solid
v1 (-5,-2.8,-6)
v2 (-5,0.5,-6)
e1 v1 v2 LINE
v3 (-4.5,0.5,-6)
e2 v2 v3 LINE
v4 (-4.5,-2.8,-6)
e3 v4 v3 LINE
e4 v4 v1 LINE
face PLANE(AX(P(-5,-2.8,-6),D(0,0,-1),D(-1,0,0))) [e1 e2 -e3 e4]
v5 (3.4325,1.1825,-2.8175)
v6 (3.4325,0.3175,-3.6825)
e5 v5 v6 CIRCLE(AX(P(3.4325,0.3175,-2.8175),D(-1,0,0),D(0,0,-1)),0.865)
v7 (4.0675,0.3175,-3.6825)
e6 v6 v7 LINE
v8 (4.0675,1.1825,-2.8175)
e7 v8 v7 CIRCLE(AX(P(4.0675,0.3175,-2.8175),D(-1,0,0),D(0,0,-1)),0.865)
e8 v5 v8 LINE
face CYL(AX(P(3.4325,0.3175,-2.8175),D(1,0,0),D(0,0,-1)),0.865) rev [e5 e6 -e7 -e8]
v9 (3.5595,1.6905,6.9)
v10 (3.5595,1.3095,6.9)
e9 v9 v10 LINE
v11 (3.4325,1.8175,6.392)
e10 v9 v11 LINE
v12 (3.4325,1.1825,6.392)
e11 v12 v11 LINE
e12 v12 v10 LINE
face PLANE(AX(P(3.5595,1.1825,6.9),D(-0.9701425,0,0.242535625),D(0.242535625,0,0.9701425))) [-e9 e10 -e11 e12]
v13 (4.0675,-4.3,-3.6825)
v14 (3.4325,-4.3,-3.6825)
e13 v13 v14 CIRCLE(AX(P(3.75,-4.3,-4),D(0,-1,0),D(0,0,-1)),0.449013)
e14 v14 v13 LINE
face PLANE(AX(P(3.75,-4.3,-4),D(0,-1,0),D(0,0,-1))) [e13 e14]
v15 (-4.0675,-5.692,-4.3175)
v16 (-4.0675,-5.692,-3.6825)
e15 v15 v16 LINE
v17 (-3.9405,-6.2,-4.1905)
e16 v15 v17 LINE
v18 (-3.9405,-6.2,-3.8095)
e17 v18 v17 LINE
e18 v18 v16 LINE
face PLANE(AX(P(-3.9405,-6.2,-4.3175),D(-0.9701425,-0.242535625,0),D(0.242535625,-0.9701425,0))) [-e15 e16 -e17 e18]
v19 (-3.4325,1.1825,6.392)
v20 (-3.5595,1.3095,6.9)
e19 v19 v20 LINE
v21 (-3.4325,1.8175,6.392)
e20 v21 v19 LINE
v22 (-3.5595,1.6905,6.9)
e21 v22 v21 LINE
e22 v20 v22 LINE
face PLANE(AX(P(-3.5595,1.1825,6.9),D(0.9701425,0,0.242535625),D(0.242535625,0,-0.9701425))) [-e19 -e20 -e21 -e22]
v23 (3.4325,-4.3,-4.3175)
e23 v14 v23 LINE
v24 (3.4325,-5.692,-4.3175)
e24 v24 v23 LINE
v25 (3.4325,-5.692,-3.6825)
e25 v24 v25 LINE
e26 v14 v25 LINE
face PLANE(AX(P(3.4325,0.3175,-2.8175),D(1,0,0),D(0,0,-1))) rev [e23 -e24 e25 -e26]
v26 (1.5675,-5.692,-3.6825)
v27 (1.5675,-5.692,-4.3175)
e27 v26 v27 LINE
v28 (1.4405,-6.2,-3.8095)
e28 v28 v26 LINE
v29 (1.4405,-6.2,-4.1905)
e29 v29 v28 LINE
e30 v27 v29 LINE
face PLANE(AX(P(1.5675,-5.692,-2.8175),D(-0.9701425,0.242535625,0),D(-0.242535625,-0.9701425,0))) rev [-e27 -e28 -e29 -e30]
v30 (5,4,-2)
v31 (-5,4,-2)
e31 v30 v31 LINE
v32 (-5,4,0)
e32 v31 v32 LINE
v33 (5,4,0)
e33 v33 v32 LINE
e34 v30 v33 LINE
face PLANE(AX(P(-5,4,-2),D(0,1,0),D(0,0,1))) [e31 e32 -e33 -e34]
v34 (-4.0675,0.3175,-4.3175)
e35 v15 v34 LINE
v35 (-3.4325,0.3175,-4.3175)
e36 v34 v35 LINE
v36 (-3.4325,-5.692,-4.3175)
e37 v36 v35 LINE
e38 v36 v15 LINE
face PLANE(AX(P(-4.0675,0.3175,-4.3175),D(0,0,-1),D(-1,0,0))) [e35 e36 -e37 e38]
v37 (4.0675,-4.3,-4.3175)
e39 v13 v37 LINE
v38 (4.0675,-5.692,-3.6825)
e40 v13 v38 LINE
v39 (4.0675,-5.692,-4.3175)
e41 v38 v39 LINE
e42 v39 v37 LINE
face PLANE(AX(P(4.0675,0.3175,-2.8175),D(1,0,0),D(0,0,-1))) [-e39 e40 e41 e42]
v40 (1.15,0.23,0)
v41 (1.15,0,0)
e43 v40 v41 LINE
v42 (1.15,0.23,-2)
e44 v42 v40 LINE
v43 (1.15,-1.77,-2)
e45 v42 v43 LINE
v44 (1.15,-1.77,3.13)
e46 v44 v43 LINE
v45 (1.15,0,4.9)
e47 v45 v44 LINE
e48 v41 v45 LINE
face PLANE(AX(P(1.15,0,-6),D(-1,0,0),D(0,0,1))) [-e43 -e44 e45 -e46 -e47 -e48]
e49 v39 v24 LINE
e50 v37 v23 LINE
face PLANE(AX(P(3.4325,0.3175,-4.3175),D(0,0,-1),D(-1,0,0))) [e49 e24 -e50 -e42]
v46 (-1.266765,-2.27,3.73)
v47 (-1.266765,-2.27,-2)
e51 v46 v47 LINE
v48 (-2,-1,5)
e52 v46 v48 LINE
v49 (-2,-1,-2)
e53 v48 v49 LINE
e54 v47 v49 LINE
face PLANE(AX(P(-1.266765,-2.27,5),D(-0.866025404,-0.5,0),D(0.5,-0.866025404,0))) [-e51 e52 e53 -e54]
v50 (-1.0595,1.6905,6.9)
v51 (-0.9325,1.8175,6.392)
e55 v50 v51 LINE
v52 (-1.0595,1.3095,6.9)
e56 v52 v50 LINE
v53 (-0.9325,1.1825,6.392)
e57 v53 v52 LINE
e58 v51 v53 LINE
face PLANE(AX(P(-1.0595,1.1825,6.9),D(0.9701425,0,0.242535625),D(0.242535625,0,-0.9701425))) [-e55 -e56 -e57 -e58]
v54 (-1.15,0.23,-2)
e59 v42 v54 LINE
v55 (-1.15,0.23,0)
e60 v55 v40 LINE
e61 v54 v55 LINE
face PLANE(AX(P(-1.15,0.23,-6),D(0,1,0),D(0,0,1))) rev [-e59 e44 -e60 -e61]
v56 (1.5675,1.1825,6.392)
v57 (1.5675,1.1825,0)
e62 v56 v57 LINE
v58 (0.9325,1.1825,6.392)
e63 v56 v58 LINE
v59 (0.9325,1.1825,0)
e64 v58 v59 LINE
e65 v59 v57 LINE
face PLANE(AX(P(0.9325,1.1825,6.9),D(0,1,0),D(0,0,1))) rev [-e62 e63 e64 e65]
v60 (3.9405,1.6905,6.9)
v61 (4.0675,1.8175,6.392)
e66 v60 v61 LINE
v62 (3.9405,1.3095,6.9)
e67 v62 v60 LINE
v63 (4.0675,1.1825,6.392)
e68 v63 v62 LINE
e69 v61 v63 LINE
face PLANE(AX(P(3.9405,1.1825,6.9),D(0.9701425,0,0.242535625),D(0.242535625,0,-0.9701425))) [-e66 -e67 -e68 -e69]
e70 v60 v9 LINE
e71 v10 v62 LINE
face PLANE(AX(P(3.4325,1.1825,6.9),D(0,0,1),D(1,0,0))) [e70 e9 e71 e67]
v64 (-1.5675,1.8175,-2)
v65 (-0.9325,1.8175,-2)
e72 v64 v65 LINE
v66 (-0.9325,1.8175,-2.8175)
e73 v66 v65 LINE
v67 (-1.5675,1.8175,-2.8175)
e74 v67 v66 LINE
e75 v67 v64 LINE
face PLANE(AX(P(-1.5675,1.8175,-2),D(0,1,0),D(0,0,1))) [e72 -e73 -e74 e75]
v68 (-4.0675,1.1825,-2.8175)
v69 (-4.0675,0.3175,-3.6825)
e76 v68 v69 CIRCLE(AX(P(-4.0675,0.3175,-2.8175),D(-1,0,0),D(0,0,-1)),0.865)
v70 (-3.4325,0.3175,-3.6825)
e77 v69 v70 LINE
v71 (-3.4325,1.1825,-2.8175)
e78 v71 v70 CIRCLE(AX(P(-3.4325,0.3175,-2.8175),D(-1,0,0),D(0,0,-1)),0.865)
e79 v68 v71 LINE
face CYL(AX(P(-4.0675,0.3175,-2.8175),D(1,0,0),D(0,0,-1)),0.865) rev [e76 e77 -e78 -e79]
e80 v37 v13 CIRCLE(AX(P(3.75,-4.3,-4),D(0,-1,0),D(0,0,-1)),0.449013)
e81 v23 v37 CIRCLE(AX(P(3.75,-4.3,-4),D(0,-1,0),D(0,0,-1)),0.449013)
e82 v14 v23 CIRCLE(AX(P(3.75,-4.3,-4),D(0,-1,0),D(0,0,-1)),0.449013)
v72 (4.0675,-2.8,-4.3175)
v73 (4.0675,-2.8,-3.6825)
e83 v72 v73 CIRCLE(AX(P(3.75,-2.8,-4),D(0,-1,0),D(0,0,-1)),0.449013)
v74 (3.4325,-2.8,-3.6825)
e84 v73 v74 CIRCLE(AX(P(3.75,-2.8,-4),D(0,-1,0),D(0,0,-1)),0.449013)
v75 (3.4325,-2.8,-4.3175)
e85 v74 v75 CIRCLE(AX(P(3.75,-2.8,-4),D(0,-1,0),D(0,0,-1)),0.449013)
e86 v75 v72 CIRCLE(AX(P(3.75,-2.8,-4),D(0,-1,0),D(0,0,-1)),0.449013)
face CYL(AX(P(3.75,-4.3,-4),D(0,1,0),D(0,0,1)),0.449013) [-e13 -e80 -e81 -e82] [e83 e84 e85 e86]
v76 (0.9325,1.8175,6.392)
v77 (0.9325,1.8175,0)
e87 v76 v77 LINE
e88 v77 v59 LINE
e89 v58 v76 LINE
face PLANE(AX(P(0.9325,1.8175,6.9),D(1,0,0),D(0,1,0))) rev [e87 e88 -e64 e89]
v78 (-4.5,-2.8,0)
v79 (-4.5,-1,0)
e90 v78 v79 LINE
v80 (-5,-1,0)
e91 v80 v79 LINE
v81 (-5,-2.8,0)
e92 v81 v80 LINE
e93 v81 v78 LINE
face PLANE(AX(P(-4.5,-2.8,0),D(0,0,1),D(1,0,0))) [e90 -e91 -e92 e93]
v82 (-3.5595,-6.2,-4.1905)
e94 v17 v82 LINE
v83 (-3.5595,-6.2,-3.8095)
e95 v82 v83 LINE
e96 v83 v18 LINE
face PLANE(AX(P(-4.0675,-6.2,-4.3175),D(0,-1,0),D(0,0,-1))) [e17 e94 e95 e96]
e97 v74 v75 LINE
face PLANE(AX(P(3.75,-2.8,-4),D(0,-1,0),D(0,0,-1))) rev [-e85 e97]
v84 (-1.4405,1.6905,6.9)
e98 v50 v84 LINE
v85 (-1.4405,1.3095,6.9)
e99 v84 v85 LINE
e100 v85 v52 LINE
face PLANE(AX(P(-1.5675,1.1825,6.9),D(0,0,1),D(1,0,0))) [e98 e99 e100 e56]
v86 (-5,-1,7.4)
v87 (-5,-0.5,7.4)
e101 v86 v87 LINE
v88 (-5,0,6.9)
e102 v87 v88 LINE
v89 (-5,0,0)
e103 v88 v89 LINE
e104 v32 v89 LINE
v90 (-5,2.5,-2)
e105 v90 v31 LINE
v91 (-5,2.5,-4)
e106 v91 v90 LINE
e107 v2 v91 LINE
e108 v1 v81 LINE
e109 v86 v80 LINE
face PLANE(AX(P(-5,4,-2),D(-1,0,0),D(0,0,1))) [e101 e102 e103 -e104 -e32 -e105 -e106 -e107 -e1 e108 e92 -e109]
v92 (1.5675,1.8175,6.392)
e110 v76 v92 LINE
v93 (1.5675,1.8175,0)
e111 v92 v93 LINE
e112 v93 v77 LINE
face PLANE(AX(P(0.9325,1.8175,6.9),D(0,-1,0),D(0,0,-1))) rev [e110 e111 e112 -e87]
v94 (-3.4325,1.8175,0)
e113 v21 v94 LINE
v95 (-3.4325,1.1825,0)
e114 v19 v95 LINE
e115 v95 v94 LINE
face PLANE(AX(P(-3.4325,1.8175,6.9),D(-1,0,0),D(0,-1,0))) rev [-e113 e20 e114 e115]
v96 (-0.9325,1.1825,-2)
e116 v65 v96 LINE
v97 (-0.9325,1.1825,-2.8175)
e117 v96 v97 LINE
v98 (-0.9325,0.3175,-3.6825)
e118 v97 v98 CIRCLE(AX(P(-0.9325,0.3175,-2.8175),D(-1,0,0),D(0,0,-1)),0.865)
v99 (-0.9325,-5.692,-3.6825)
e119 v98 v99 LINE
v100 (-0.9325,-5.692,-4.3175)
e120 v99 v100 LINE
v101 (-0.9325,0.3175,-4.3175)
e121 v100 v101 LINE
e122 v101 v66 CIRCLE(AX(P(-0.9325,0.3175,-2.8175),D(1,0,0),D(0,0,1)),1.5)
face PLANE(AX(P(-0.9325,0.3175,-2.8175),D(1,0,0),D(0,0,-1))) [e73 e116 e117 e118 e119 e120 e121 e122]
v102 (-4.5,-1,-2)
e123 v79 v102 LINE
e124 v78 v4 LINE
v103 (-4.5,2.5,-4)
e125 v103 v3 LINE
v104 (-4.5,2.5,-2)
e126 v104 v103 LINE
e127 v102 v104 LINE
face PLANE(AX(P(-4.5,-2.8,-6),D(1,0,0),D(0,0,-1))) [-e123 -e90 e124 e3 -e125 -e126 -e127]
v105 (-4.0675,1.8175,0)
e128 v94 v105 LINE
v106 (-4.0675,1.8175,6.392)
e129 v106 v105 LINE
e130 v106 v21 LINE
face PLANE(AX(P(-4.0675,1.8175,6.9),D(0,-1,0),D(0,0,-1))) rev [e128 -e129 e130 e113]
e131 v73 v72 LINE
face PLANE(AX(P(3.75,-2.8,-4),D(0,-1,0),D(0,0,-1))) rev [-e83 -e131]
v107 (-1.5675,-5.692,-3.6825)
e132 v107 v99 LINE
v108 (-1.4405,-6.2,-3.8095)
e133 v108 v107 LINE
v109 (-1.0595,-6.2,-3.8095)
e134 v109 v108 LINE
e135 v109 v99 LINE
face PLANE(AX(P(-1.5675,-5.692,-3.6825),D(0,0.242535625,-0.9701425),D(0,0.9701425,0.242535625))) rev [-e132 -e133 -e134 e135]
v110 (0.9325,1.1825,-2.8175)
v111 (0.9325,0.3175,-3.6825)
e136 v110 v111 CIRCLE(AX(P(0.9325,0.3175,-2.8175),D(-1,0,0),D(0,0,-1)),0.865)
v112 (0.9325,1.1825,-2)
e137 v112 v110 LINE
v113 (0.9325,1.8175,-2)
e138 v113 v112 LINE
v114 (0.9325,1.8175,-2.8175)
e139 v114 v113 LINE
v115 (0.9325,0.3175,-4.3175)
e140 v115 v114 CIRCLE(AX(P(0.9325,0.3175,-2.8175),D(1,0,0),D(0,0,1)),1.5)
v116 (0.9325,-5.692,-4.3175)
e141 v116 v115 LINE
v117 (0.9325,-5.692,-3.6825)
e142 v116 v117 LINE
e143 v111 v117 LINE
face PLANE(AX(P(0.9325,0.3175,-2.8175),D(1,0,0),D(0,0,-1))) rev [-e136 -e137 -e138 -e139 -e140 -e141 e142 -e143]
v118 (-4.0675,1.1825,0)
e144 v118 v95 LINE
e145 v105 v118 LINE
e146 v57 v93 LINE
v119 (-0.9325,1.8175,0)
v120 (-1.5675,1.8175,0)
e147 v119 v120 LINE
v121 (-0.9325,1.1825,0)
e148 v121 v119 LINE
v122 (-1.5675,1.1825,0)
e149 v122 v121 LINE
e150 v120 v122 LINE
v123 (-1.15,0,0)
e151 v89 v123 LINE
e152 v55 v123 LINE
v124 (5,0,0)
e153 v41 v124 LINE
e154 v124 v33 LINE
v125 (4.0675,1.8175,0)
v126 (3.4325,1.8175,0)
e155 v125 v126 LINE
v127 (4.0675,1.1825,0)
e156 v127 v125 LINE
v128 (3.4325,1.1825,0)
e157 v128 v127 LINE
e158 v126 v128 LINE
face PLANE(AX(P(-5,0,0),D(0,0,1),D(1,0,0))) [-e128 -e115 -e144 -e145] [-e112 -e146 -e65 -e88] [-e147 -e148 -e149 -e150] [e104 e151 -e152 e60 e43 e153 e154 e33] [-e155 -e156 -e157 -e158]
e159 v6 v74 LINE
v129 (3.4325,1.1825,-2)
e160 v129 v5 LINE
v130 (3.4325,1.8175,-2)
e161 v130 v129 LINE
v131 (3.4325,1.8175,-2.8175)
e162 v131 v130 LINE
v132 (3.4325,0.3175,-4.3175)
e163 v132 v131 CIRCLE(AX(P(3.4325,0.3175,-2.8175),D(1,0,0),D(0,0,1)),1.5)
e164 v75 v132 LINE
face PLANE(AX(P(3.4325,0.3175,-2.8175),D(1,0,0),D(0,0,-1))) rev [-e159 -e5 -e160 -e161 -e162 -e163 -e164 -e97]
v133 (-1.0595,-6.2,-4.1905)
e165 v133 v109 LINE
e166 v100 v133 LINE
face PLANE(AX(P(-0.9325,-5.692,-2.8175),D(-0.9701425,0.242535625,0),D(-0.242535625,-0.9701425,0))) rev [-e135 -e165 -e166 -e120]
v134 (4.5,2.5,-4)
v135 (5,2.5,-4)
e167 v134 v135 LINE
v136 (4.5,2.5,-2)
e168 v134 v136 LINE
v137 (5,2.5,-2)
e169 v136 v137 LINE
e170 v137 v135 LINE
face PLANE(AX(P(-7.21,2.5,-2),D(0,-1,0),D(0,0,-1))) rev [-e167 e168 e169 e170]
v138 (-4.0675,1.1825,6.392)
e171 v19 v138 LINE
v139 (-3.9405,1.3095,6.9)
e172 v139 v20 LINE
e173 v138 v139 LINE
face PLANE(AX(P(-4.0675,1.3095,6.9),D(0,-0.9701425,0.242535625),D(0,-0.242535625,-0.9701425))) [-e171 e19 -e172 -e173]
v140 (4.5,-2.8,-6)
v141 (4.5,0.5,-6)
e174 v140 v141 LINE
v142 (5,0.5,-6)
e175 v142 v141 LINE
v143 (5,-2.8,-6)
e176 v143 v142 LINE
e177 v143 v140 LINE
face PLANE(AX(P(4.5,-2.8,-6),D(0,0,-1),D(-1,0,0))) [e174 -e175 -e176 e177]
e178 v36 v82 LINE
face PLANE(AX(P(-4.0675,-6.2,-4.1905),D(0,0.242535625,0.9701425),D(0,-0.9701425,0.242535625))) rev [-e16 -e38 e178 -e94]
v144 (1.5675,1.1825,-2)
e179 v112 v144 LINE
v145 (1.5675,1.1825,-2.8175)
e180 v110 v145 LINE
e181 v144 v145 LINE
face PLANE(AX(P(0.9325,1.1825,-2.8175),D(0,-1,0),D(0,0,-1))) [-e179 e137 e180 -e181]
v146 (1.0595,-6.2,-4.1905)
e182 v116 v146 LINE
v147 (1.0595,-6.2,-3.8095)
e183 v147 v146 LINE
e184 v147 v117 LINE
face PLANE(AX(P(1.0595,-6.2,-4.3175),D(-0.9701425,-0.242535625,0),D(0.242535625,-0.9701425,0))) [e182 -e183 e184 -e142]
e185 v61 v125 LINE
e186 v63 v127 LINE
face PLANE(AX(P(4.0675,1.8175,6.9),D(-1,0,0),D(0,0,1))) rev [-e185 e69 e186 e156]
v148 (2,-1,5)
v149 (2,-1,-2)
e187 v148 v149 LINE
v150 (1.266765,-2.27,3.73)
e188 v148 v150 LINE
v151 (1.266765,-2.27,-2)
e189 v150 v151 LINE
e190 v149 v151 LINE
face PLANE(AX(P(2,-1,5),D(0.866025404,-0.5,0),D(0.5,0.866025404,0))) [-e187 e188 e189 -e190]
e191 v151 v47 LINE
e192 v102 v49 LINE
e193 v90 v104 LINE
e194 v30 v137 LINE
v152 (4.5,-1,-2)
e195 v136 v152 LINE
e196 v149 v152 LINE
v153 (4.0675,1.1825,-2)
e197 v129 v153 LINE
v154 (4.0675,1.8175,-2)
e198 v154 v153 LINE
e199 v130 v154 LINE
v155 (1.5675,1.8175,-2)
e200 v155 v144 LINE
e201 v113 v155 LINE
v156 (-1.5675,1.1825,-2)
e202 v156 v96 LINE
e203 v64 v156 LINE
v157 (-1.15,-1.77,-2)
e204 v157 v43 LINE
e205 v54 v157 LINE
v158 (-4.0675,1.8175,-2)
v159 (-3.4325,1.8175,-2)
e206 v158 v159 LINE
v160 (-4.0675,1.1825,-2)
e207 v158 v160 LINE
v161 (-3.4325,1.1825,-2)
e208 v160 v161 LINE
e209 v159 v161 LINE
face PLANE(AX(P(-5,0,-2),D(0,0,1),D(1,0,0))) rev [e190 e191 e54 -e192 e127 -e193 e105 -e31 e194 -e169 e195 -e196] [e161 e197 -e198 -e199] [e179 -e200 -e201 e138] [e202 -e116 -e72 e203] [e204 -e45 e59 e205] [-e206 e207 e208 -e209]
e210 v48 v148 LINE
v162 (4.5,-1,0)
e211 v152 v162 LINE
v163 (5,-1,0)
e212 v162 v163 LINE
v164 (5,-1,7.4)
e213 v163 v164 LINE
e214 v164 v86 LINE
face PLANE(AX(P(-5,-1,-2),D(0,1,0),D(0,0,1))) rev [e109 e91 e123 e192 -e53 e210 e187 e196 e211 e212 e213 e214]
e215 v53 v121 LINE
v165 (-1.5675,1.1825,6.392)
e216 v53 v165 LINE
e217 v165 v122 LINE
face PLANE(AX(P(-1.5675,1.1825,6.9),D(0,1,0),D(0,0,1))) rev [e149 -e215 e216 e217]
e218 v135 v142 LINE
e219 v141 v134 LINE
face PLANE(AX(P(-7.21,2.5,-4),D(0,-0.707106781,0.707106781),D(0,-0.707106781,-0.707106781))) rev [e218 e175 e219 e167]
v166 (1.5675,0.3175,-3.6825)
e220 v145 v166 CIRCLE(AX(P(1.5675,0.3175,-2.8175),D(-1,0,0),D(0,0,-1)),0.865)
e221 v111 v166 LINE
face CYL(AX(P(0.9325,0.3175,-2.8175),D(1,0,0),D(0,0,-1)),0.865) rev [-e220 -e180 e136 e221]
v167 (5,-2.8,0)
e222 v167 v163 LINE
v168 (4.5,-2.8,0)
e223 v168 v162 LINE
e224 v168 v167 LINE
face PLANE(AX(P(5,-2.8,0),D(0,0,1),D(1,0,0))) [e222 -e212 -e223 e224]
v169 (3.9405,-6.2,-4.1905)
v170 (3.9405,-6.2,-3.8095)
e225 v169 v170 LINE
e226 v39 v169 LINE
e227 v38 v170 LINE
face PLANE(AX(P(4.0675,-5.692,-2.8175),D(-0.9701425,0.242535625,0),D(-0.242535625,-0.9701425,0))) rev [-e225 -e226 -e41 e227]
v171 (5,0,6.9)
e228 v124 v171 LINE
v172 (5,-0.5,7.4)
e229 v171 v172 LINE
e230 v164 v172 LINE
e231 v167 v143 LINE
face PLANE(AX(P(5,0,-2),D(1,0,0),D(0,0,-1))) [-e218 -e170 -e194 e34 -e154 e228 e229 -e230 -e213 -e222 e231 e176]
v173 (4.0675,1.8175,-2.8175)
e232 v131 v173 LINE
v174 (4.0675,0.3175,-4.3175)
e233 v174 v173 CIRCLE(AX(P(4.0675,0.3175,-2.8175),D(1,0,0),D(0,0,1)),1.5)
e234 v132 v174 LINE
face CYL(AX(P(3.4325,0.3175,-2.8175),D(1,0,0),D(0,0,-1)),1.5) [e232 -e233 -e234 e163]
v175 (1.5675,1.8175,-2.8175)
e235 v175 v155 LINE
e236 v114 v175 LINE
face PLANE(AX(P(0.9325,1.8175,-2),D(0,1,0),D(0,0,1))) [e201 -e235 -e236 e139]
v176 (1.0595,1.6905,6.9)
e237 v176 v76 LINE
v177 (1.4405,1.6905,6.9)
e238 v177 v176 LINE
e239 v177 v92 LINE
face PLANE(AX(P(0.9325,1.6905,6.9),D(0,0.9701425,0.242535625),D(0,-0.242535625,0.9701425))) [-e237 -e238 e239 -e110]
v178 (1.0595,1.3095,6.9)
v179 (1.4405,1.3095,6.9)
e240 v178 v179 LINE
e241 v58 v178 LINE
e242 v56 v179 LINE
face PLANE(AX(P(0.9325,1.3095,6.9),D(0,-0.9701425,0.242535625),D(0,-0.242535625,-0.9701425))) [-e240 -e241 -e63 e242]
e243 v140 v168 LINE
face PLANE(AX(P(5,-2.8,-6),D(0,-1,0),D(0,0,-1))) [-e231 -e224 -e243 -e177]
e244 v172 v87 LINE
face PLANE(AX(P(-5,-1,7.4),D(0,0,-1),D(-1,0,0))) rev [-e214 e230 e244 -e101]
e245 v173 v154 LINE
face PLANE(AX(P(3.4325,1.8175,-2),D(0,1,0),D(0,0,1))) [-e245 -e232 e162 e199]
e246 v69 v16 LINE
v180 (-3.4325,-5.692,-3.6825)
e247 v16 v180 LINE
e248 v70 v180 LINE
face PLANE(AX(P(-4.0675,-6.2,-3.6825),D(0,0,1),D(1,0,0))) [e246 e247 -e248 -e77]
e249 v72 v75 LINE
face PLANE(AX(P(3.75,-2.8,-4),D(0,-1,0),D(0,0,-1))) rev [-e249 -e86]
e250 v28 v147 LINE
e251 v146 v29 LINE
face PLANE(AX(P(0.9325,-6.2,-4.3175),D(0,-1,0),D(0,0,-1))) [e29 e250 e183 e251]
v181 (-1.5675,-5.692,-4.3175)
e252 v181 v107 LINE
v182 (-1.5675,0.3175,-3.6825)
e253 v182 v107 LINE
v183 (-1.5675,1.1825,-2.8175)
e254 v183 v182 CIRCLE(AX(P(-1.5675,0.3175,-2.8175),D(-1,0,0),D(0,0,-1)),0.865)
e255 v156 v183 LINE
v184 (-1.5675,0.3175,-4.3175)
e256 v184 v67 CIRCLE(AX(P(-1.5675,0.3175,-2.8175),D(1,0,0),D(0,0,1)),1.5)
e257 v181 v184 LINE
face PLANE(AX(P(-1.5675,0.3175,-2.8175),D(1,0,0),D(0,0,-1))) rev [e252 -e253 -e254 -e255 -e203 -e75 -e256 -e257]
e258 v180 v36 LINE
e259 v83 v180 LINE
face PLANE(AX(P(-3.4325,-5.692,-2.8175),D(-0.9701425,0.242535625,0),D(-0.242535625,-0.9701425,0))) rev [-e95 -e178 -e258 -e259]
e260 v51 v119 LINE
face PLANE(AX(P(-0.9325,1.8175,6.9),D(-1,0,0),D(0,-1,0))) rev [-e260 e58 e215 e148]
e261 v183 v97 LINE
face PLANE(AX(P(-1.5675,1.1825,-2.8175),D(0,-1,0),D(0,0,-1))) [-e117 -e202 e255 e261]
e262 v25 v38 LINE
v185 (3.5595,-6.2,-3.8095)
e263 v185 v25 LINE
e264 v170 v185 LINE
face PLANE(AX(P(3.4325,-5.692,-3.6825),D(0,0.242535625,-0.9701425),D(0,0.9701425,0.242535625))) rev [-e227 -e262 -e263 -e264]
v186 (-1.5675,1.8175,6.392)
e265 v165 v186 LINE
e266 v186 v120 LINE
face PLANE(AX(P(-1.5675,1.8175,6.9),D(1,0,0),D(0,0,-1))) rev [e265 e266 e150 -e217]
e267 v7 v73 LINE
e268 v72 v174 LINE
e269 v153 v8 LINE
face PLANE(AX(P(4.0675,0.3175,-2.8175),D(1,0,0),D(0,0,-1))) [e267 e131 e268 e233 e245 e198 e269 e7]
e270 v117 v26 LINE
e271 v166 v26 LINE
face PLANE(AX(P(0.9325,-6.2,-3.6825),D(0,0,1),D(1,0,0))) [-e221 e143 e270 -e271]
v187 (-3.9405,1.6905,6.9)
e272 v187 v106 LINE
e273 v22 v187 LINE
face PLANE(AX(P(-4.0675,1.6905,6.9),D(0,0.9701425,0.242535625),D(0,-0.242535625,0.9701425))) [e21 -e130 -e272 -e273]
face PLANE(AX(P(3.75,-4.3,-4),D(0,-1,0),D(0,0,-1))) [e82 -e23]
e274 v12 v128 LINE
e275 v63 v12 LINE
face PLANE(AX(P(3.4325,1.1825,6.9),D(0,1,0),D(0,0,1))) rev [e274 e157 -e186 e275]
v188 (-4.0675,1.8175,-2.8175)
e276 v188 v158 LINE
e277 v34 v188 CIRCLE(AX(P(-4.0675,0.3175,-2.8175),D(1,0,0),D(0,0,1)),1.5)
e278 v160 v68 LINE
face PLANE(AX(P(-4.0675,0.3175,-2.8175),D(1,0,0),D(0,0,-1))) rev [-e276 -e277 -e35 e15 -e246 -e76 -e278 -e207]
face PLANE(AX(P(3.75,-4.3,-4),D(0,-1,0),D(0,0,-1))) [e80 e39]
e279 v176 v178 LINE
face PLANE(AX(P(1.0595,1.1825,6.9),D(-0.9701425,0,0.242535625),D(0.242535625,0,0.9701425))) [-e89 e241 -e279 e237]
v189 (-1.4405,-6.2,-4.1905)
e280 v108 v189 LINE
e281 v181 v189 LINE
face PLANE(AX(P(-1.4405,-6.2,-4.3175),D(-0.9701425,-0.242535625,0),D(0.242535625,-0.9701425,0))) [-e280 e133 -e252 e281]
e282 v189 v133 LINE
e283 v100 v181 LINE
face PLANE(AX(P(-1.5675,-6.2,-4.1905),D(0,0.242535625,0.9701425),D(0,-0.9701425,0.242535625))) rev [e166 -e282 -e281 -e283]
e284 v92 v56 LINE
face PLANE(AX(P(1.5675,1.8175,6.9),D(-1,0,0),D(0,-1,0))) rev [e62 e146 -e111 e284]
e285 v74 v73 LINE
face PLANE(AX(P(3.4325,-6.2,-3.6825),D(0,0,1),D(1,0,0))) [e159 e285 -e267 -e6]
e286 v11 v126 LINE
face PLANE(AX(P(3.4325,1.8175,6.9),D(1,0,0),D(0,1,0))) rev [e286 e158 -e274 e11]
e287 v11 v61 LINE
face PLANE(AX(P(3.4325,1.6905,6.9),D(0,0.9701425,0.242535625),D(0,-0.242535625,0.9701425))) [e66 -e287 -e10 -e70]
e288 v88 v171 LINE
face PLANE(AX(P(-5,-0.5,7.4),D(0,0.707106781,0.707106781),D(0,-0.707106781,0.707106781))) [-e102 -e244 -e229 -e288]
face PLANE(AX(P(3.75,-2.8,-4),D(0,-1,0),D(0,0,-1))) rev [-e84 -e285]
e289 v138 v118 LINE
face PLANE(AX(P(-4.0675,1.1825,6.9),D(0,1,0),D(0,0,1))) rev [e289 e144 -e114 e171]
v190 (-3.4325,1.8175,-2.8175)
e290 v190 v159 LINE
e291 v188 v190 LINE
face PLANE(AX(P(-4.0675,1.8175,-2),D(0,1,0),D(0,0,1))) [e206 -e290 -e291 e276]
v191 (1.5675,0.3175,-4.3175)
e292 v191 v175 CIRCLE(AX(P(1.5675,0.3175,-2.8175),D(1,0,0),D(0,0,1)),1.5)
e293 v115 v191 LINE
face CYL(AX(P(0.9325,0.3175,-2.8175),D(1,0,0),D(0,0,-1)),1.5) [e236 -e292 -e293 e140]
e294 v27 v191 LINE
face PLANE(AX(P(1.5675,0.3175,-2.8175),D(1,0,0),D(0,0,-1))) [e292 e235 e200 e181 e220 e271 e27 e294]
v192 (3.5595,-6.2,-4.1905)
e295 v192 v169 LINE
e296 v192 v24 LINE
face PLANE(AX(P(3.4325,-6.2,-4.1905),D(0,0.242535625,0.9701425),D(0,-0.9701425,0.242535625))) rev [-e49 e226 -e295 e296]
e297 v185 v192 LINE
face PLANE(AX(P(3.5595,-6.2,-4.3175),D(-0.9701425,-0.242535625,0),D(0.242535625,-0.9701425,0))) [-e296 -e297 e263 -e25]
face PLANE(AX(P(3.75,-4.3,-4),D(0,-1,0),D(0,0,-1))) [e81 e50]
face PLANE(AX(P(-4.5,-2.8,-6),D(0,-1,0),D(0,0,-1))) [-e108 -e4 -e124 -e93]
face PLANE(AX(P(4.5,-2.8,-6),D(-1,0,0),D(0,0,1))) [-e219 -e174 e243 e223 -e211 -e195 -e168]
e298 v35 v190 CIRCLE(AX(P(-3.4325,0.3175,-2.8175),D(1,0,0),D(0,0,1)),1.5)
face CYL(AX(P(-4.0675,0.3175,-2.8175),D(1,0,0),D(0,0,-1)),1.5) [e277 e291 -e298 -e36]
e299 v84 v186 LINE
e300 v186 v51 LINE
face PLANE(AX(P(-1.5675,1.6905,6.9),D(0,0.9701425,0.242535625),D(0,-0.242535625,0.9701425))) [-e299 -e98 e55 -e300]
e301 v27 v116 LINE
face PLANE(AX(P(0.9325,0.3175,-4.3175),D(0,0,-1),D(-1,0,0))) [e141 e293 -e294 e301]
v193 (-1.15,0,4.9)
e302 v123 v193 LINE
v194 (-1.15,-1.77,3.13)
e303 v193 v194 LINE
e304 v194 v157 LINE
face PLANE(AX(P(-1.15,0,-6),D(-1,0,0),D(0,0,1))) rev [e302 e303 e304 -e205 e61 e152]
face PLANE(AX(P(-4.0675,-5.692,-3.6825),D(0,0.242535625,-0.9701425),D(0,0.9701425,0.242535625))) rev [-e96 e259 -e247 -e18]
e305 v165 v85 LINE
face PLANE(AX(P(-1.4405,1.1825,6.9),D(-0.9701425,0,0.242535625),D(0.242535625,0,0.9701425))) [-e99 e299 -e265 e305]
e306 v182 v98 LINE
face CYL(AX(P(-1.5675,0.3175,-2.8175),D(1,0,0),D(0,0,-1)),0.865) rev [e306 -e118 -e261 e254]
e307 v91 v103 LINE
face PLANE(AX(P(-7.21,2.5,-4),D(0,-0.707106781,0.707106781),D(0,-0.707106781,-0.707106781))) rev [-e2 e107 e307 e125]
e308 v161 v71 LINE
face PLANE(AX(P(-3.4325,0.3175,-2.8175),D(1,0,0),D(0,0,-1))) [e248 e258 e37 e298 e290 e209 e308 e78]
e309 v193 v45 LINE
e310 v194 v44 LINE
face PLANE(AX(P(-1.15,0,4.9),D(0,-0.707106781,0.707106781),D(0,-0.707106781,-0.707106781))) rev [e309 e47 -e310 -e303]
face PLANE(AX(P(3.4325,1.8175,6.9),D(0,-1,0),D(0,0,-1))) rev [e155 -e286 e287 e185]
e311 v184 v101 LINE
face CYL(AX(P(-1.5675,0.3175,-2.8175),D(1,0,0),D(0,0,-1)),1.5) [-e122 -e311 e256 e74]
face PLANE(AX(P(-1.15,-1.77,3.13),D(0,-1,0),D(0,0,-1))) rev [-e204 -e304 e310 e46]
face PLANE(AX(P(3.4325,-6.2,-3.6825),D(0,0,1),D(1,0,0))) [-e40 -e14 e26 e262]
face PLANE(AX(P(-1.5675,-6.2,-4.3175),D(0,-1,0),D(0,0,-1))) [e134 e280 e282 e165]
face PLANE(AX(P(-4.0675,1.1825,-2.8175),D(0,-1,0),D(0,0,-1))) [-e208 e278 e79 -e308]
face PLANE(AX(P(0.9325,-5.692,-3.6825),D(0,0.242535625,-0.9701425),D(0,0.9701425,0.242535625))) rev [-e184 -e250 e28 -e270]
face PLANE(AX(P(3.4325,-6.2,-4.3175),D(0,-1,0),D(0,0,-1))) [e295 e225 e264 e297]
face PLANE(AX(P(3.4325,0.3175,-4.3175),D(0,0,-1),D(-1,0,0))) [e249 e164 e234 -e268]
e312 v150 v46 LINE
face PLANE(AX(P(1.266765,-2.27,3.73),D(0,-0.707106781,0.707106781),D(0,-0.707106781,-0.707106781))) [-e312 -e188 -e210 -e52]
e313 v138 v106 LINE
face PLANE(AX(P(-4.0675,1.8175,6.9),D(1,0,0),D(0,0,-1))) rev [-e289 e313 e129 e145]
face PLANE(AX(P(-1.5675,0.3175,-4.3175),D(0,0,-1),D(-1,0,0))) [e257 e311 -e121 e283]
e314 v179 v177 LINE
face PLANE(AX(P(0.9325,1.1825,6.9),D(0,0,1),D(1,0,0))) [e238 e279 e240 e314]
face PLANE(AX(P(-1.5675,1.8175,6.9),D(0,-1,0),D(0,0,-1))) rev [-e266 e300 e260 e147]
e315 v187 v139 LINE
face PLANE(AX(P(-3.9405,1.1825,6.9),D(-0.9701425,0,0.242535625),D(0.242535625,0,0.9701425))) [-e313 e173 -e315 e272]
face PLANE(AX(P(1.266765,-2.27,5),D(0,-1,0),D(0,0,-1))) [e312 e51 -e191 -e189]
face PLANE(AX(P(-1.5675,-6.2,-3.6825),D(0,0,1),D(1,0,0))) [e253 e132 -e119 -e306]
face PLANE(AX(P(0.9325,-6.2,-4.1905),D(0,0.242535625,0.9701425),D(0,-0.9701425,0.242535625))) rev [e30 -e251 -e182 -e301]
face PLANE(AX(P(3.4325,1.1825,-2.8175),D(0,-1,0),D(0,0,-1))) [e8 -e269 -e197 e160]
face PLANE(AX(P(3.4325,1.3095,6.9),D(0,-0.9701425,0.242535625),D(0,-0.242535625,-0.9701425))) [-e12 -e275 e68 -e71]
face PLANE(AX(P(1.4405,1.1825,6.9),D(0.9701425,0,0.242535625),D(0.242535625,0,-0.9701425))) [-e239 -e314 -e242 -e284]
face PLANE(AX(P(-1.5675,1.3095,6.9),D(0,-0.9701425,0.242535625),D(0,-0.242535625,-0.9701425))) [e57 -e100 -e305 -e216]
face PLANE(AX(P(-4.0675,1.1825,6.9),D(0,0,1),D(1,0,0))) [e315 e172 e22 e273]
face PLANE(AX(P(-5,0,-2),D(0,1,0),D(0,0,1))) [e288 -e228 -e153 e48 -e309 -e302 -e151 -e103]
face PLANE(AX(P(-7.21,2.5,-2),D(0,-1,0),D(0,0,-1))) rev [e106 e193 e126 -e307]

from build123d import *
from OCP.BRepFilletAPI import BRepFilletAPI_MakeChamfer

# Parameters (mm, degrees)
SKETCH1_W                             = 10
SKETCH1_H                             = 4
BODY_BASE_DEPTH                       = 2
SKETCH2_W                             = 0.635
SKETCH2_H                             = 0.635
HORIZONTAL_PINS_DEPTH                 = 6.9
SKETCH3_W                             = 10
SKETCH3_H                             = 9.4
BODY_HORIZONTAL_SHELF_DEPTH           = 1
MATING_CONNECTOR_LEAD_IN_CHAMFER_SIZE = 0.5
SKETCH4_W                             = 0.5
SKETCH4_H                             = 6
BODY_SIDEWALLS_DEPTH                  = 6.8
BODY_SIDEWALL_MATERIA_REMOVALL_DEPTH  = 7.21
LOCKING_TROUGH_EXTERIOR_DEPTH         = 7
LOCKING_TROUGH_CHAMFER_EXTERIOR_SIZE  = 1.27
LOCKING_TROUGH_MATERIAL_REMOVAL_DEPTH = 1.15
REMAINDER_OF_PIN_DEPTH                = 0.635
LPATTERN_COMPLEMENT_OF_PINS_COUNT     = 4
LPATTERN_COMPLEMENT_OF_PINS_PITCH     = 2.5
PIN_CHAMFER1_SIZE                     = 0.508
PIN_CHAMFER1_SIZE2                    = 0.127
PIN_CHAMFER2_SIZE                     = 0.127
PIN_CHAMFER2_SIZE2                    = 0.508
SKETCH11_R                            = 0.449012806
PIN_1_MARKING_AND_MATE_AIDE_DEPTH     = 1.5


with BuildPart() as part:
    # Sketch1 → Body base (new body)
    with BuildSketch(Plane.XY):
        with Locations((0, 2)):
            Rectangle(SKETCH1_W, SKETCH1_H)
    extrude(amount=-BODY_BASE_DEPTH)

    # Sketch2 → Horizontal pins (add)
    with BuildSketch(Plane.XY):
        with Locations((-3.75, 1.5)):
            Rectangle(SKETCH2_W, SKETCH2_H)
        with Locations((-1.25, 1.5)):
            Rectangle(SKETCH2_W, SKETCH2_H)
        with Locations((1.25, 1.5)):
            Rectangle(SKETCH2_W, SKETCH2_H)
        with Locations((3.75, 1.5)):
            Rectangle(SKETCH2_W, SKETCH2_H)
    extrude(amount=HORIZONTAL_PINS_DEPTH)

    # Sketch3 → Body - horizontal shelf (add)
    with BuildSketch(Plane.XZ):
        with Locations((0, 2.7)):
            Rectangle(SKETCH3_W, SKETCH3_H)
    extrude(amount=BODY_HORIZONTAL_SHELF_DEPTH)

    # Mating connector lead-in chamfer
    mating_connector_lead_in_chamfer_edges = [part.edges().sort_by_distance(p)[0] for p in [
        (0, 0, 7.4),
    ]]
    chamfer(mating_connector_lead_in_chamfer_edges, length=MATING_CONNECTOR_LEAD_IN_CHAMFER_SIZE)

    # Sketch4 → Body sidewalls (add)
    with BuildSketch(Plane(origin=(0, 4, 0), x_dir=(1, 0, 0), z_dir=(0, 1, 0))):
        with Locations((-4.75, 3)):
            Rectangle(SKETCH4_W, SKETCH4_H)
        with Locations((4.75, 3)):
            Rectangle(SKETCH4_W, SKETCH4_H)
    extrude(amount=-BODY_SIDEWALLS_DEPTH)

    # Sketch5 → Body sidewall - materia removall (cut, symmetric)
    with BuildSketch(Plane(origin=(0, 0, 0), x_dir=(0, 0, -1), z_dir=(1, 0, 0))):
        Polygon((2, 4), (2, 2.5), (4, 2.5), (6, 0.5), (6, 4), align=None)
    extrude(amount=BODY_SIDEWALL_MATERIA_REMOVALL_DEPTH, both=True, mode=Mode.SUBTRACT)

    # Sketch6 → Locking trough - exterior (add)
    with BuildSketch(Plane(origin=(0, 0, -2), x_dir=(-1, 0, 0), z_dir=(0, 0, -1))):
        Polygon((-2, -1), (-1.266765158, -2.27), (1.266765158, -2.27), (2, -1), align=None)
    extrude(amount=-LOCKING_TROUGH_EXTERIOR_DEPTH)

    # Locking trough chamfer - exterior
    locking_trough_chamfer_exterior_edges = [part.edges().sort_by_distance(p)[0] for p in [
        (0, -2.27, 5),
    ]]
    chamfer(locking_trough_chamfer_exterior_edges, length=LOCKING_TROUGH_CHAMFER_EXTERIOR_SIZE - 0.0001)  # a hair under: the kernel refuses the full size

    # Sketch8 → Locking trough - material removal (cut, symmetric)
    with BuildSketch(Plane(origin=(0, 0, 0), x_dir=(0, 0, -1), z_dir=(1, 0, 0))):
        Polygon((-4.9, 0), (-3.13, -1.77), (6, -1.77), (6, 0.23), (0, 0.23), (0, 0), align=None)
    extrude(amount=LOCKING_TROUGH_MATERIAL_REMOVAL_DEPTH, both=True, mode=Mode.SUBTRACT)

    # Sketch9 → Remainder of pin (add)
    with BuildSketch(Plane(origin=(4.0675, 0, 0), x_dir=(0, 0, -1), z_dir=(1, 0, 0))):
        with BuildLine():
            Line((2, 1.8175), (2.8175, 1.8175))
            ThreePointArc((2.8175, 1.8175), (3.878160172, 1.378160172), (4.3175, 0.3175))
            Line((4.3175, 0.3175), (4.3175, -6.2))
            Line((4.3175, -6.2), (3.6825, -6.2))
            Line((3.6825, -6.2), (3.6825, 0.3175))
            ThreePointArc((3.6825, 0.3175), (3.429147366, 0.929147366), (2.8175, 1.1825))
            Line((2.8175, 1.1825), (2, 1.1825))
            Line((2, 1.1825), (2, 1.8175))
        make_face()
    remainder_of_pin = extrude(amount=-REMAINDER_OF_PIN_DEPTH)

    # LPattern - complement  of pins: Remainder of pin ×4
    with Locations(*[(-i * LPATTERN_COMPLEMENT_OF_PINS_PITCH, 0, 0) for i in range(1, LPATTERN_COMPLEMENT_OF_PINS_COUNT)]):
        add(remainder_of_pin)

    # Pin chamfer1: one chamfer whose edges measure the first distance from different faces: ONE call of the kernel's chamfer builder (chamfer() names one face for all edges)
    pin_chamfer1_edges_1 = [part.edges().sort_by_distance(p)[0] for p in [
        (-4.0675, 1.5, 6.9),
    ]]
    pin_chamfer1_side_1 = [part.faces().sort_by_distance(p)[0] for p in [
        (-4.0675, 1.5, 3.45),
    ]]
    pin_chamfer1_edges_2 = [part.edges().sort_by_distance(p)[0] for p in [
        (-3.75, 1.1825, 6.9),
    ]]
    pin_chamfer1_side_2 = [part.faces().sort_by_distance(p)[0] for p in [
        (-3.75, 1.1825, 3.45),
    ]]
    pin_chamfer1_edges_3 = [part.edges().sort_by_distance(p)[0] for p in [
        (-3.4325, 1.5, 6.9),
    ]]
    pin_chamfer1_side_3 = [part.faces().sort_by_distance(p)[0] for p in [
        (-3.4325, 1.5, 3.45),
    ]]
    pin_chamfer1_edges_4 = [part.edges().sort_by_distance(p)[0] for p in [
        (-3.75, 1.8175, 6.9),
    ]]
    pin_chamfer1_side_4 = [part.faces().sort_by_distance(p)[0] for p in [
        (-3.75, 1.8175, 3.45),
    ]]
    pin_chamfer1_edges_5 = [part.edges().sort_by_distance(p)[0] for p in [
        (-1.5675, 1.5, 6.9),
    ]]
    pin_chamfer1_side_5 = [part.faces().sort_by_distance(p)[0] for p in [
        (-1.5675, 1.5, 3.45),
    ]]
    pin_chamfer1_edges_6 = [part.edges().sort_by_distance(p)[0] for p in [
        (-1.25, 1.1825, 6.9),
    ]]
    pin_chamfer1_side_6 = [part.faces().sort_by_distance(p)[0] for p in [
        (-1.25, 1.1825, 3.45),
    ]]
    pin_chamfer1_edges_7 = [part.edges().sort_by_distance(p)[0] for p in [
        (-0.9325, 1.5, 6.9),
    ]]
    pin_chamfer1_side_7 = [part.faces().sort_by_distance(p)[0] for p in [
        (-0.9325, 1.5, 3.45),
    ]]
    pin_chamfer1_edges_8 = [part.edges().sort_by_distance(p)[0] for p in [
        (-1.25, 1.8175, 6.9),
    ]]
    pin_chamfer1_side_8 = [part.faces().sort_by_distance(p)[0] for p in [
        (-1.25, 1.8175, 3.45),
    ]]
    pin_chamfer1_edges_9 = [part.edges().sort_by_distance(p)[0] for p in [
        (0.9325, 1.5, 6.9),
    ]]
    pin_chamfer1_side_9 = [part.faces().sort_by_distance(p)[0] for p in [
        (0.9325, 1.5, 3.45),
    ]]
    pin_chamfer1_edges_10 = [part.edges().sort_by_distance(p)[0] for p in [
        (1.25, 1.1825, 6.9),
    ]]
    pin_chamfer1_side_10 = [part.faces().sort_by_distance(p)[0] for p in [
        (1.25, 1.1825, 3.45),
    ]]
    pin_chamfer1_edges_11 = [part.edges().sort_by_distance(p)[0] for p in [
        (1.5675, 1.5, 6.9),
    ]]
    pin_chamfer1_side_11 = [part.faces().sort_by_distance(p)[0] for p in [
        (1.5675, 1.5, 3.45),
    ]]
    pin_chamfer1_edges_12 = [part.edges().sort_by_distance(p)[0] for p in [
        (1.25, 1.8175, 6.9),
    ]]
    pin_chamfer1_side_12 = [part.faces().sort_by_distance(p)[0] for p in [
        (1.25, 1.8175, 3.45),
    ]]
    pin_chamfer1_edges_13 = [part.edges().sort_by_distance(p)[0] for p in [
        (3.4325, 1.5, 6.9),
    ]]
    pin_chamfer1_side_13 = [part.faces().sort_by_distance(p)[0] for p in [
        (3.4325, 1.5, 3.45),
    ]]
    pin_chamfer1_edges_14 = [part.edges().sort_by_distance(p)[0] for p in [
        (3.75, 1.1825, 6.9),
    ]]
    pin_chamfer1_side_14 = [part.faces().sort_by_distance(p)[0] for p in [
        (3.75, 1.1825, 3.45),
    ]]
    pin_chamfer1_edges_15 = [part.edges().sort_by_distance(p)[0] for p in [
        (4.0675, 1.5, 6.9),
    ]]
    pin_chamfer1_side_15 = [part.faces().sort_by_distance(p)[0] for p in [
        (4.0675, 1.5, 3.45),
    ]]
    pin_chamfer1_edges_16 = [part.edges().sort_by_distance(p)[0] for p in [
        (3.75, 1.8175, 6.9),
    ]]
    pin_chamfer1_side_16 = [part.faces().sort_by_distance(p)[0] for p in [
        (3.75, 1.8175, 3.45),
    ]]
    pin_chamfer1 = BRepFilletAPI_MakeChamfer(part.part.solid().wrapped)
    for e in pin_chamfer1_edges_1:
        pin_chamfer1.Add(PIN_CHAMFER1_SIZE, PIN_CHAMFER1_SIZE2, e.wrapped, pin_chamfer1_side_1[0].wrapped)  # the first distance lies on this face
    for e in pin_chamfer1_edges_2:
        pin_chamfer1.Add(PIN_CHAMFER1_SIZE, PIN_CHAMFER1_SIZE2, e.wrapped, pin_chamfer1_side_2[0].wrapped)  # the first distance lies on this face
    for e in pin_chamfer1_edges_3:
        pin_chamfer1.Add(PIN_CHAMFER1_SIZE, PIN_CHAMFER1_SIZE2, e.wrapped, pin_chamfer1_side_3[0].wrapped)  # the first distance lies on this face
    for e in pin_chamfer1_edges_4:
        pin_chamfer1.Add(PIN_CHAMFER1_SIZE, PIN_CHAMFER1_SIZE2, e.wrapped, pin_chamfer1_side_4[0].wrapped)  # the first distance lies on this face
    for e in pin_chamfer1_edges_5:
        pin_chamfer1.Add(PIN_CHAMFER1_SIZE, PIN_CHAMFER1_SIZE2, e.wrapped, pin_chamfer1_side_5[0].wrapped)  # the first distance lies on this face
    for e in pin_chamfer1_edges_6:
        pin_chamfer1.Add(PIN_CHAMFER1_SIZE, PIN_CHAMFER1_SIZE2, e.wrapped, pin_chamfer1_side_6[0].wrapped)  # the first distance lies on this face
    for e in pin_chamfer1_edges_7:
        pin_chamfer1.Add(PIN_CHAMFER1_SIZE, PIN_CHAMFER1_SIZE2, e.wrapped, pin_chamfer1_side_7[0].wrapped)  # the first distance lies on this face
    for e in pin_chamfer1_edges_8:
        pin_chamfer1.Add(PIN_CHAMFER1_SIZE, PIN_CHAMFER1_SIZE2, e.wrapped, pin_chamfer1_side_8[0].wrapped)  # the first distance lies on this face
    for e in pin_chamfer1_edges_9:
        pin_chamfer1.Add(PIN_CHAMFER1_SIZE, PIN_CHAMFER1_SIZE2, e.wrapped, pin_chamfer1_side_9[0].wrapped)  # the first distance lies on this face
    for e in pin_chamfer1_edges_10:
        pin_chamfer1.Add(PIN_CHAMFER1_SIZE, PIN_CHAMFER1_SIZE2, e.wrapped, pin_chamfer1_side_10[0].wrapped)  # the first distance lies on this face
    for e in pin_chamfer1_edges_11:
        pin_chamfer1.Add(PIN_CHAMFER1_SIZE, PIN_CHAMFER1_SIZE2, e.wrapped, pin_chamfer1_side_11[0].wrapped)  # the first distance lies on this face
    for e in pin_chamfer1_edges_12:
        pin_chamfer1.Add(PIN_CHAMFER1_SIZE, PIN_CHAMFER1_SIZE2, e.wrapped, pin_chamfer1_side_12[0].wrapped)  # the first distance lies on this face
    for e in pin_chamfer1_edges_13:
        pin_chamfer1.Add(PIN_CHAMFER1_SIZE, PIN_CHAMFER1_SIZE2, e.wrapped, pin_chamfer1_side_13[0].wrapped)  # the first distance lies on this face
    for e in pin_chamfer1_edges_14:
        pin_chamfer1.Add(PIN_CHAMFER1_SIZE, PIN_CHAMFER1_SIZE2, e.wrapped, pin_chamfer1_side_14[0].wrapped)  # the first distance lies on this face
    for e in pin_chamfer1_edges_15:
        pin_chamfer1.Add(PIN_CHAMFER1_SIZE, PIN_CHAMFER1_SIZE2, e.wrapped, pin_chamfer1_side_15[0].wrapped)  # the first distance lies on this face
    for e in pin_chamfer1_edges_16:
        pin_chamfer1.Add(PIN_CHAMFER1_SIZE, PIN_CHAMFER1_SIZE2, e.wrapped, pin_chamfer1_side_16[0].wrapped)  # the first distance lies on this face
    add(Compound.cast(pin_chamfer1.Shape()), mode=Mode.REPLACE)

    # Pin chamfer2: one chamfer whose edges measure the first distance from different faces: ONE call of the kernel's chamfer builder (chamfer() names one face for all edges)
    pin_chamfer2_edges_1 = [part.edges().sort_by_distance(p)[0] for p in [
        (3.4325, -6.2, -4),
        (3.75, -6.2, -4.3175),
        (3.75, -6.2, -3.6825),
        (4.0675, -6.2, -4),
    ]]
    pin_chamfer2_side_1 = [part.faces().sort_by_distance(p)[0] for p in [
        (3.75, -6.2, -4),
    ]]
    pin_chamfer2_edges_2 = [part.edges().sort_by_distance(p)[0] for p in [
        (0.9325, -6.2, -4),
        (1.25, -6.2, -4.3175),
        (1.25, -6.2, -3.6825),
        (1.5675, -6.2, -4),
    ]]
    pin_chamfer2_side_2 = [part.faces().sort_by_distance(p)[0] for p in [
        (1.25, -6.2, -4),
    ]]
    pin_chamfer2_edges_3 = [part.edges().sort_by_distance(p)[0] for p in [
        (-1.5675, -6.2, -4),
        (-1.25, -6.2, -4.3175),
        (-1.25, -6.2, -3.6825),
        (-0.9325, -6.2, -4),
    ]]
    pin_chamfer2_side_3 = [part.faces().sort_by_distance(p)[0] for p in [
        (-1.25, -6.2, -4),
    ]]
    pin_chamfer2_edges_4 = [part.edges().sort_by_distance(p)[0] for p in [
        (-4.0675, -6.2, -4),
        (-3.75, -6.2, -4.3175),
        (-3.75, -6.2, -3.6825),
        (-3.4325, -6.2, -4),
    ]]
    pin_chamfer2_side_4 = [part.faces().sort_by_distance(p)[0] for p in [
        (-3.75, -6.2, -4),
    ]]
    pin_chamfer2 = BRepFilletAPI_MakeChamfer(part.part.solid().wrapped)
    for e in pin_chamfer2_edges_1:
        pin_chamfer2.Add(PIN_CHAMFER2_SIZE, PIN_CHAMFER2_SIZE2, e.wrapped, pin_chamfer2_side_1[0].wrapped)  # the first distance lies on this face
    for e in pin_chamfer2_edges_2:
        pin_chamfer2.Add(PIN_CHAMFER2_SIZE, PIN_CHAMFER2_SIZE2, e.wrapped, pin_chamfer2_side_2[0].wrapped)  # the first distance lies on this face
    for e in pin_chamfer2_edges_3:
        pin_chamfer2.Add(PIN_CHAMFER2_SIZE, PIN_CHAMFER2_SIZE2, e.wrapped, pin_chamfer2_side_3[0].wrapped)  # the first distance lies on this face
    for e in pin_chamfer2_edges_4:
        pin_chamfer2.Add(PIN_CHAMFER2_SIZE, PIN_CHAMFER2_SIZE2, e.wrapped, pin_chamfer2_side_4[0].wrapped)  # the first distance lies on this face
    add(Compound.cast(pin_chamfer2.Shape()), mode=Mode.REPLACE)

    # Sketch11 → Pin 1 marking and mate aide (add)
    with BuildSketch(Plane.XZ.offset(2.8)):
        with Locations(Location((3.75, -4, 0), (0, 0, 135))):
            Circle(SKETCH11_R)
    extrude(amount=PIN_1_MARKING_AND_MATE_AIDE_DEPTH)


solid = part.part
